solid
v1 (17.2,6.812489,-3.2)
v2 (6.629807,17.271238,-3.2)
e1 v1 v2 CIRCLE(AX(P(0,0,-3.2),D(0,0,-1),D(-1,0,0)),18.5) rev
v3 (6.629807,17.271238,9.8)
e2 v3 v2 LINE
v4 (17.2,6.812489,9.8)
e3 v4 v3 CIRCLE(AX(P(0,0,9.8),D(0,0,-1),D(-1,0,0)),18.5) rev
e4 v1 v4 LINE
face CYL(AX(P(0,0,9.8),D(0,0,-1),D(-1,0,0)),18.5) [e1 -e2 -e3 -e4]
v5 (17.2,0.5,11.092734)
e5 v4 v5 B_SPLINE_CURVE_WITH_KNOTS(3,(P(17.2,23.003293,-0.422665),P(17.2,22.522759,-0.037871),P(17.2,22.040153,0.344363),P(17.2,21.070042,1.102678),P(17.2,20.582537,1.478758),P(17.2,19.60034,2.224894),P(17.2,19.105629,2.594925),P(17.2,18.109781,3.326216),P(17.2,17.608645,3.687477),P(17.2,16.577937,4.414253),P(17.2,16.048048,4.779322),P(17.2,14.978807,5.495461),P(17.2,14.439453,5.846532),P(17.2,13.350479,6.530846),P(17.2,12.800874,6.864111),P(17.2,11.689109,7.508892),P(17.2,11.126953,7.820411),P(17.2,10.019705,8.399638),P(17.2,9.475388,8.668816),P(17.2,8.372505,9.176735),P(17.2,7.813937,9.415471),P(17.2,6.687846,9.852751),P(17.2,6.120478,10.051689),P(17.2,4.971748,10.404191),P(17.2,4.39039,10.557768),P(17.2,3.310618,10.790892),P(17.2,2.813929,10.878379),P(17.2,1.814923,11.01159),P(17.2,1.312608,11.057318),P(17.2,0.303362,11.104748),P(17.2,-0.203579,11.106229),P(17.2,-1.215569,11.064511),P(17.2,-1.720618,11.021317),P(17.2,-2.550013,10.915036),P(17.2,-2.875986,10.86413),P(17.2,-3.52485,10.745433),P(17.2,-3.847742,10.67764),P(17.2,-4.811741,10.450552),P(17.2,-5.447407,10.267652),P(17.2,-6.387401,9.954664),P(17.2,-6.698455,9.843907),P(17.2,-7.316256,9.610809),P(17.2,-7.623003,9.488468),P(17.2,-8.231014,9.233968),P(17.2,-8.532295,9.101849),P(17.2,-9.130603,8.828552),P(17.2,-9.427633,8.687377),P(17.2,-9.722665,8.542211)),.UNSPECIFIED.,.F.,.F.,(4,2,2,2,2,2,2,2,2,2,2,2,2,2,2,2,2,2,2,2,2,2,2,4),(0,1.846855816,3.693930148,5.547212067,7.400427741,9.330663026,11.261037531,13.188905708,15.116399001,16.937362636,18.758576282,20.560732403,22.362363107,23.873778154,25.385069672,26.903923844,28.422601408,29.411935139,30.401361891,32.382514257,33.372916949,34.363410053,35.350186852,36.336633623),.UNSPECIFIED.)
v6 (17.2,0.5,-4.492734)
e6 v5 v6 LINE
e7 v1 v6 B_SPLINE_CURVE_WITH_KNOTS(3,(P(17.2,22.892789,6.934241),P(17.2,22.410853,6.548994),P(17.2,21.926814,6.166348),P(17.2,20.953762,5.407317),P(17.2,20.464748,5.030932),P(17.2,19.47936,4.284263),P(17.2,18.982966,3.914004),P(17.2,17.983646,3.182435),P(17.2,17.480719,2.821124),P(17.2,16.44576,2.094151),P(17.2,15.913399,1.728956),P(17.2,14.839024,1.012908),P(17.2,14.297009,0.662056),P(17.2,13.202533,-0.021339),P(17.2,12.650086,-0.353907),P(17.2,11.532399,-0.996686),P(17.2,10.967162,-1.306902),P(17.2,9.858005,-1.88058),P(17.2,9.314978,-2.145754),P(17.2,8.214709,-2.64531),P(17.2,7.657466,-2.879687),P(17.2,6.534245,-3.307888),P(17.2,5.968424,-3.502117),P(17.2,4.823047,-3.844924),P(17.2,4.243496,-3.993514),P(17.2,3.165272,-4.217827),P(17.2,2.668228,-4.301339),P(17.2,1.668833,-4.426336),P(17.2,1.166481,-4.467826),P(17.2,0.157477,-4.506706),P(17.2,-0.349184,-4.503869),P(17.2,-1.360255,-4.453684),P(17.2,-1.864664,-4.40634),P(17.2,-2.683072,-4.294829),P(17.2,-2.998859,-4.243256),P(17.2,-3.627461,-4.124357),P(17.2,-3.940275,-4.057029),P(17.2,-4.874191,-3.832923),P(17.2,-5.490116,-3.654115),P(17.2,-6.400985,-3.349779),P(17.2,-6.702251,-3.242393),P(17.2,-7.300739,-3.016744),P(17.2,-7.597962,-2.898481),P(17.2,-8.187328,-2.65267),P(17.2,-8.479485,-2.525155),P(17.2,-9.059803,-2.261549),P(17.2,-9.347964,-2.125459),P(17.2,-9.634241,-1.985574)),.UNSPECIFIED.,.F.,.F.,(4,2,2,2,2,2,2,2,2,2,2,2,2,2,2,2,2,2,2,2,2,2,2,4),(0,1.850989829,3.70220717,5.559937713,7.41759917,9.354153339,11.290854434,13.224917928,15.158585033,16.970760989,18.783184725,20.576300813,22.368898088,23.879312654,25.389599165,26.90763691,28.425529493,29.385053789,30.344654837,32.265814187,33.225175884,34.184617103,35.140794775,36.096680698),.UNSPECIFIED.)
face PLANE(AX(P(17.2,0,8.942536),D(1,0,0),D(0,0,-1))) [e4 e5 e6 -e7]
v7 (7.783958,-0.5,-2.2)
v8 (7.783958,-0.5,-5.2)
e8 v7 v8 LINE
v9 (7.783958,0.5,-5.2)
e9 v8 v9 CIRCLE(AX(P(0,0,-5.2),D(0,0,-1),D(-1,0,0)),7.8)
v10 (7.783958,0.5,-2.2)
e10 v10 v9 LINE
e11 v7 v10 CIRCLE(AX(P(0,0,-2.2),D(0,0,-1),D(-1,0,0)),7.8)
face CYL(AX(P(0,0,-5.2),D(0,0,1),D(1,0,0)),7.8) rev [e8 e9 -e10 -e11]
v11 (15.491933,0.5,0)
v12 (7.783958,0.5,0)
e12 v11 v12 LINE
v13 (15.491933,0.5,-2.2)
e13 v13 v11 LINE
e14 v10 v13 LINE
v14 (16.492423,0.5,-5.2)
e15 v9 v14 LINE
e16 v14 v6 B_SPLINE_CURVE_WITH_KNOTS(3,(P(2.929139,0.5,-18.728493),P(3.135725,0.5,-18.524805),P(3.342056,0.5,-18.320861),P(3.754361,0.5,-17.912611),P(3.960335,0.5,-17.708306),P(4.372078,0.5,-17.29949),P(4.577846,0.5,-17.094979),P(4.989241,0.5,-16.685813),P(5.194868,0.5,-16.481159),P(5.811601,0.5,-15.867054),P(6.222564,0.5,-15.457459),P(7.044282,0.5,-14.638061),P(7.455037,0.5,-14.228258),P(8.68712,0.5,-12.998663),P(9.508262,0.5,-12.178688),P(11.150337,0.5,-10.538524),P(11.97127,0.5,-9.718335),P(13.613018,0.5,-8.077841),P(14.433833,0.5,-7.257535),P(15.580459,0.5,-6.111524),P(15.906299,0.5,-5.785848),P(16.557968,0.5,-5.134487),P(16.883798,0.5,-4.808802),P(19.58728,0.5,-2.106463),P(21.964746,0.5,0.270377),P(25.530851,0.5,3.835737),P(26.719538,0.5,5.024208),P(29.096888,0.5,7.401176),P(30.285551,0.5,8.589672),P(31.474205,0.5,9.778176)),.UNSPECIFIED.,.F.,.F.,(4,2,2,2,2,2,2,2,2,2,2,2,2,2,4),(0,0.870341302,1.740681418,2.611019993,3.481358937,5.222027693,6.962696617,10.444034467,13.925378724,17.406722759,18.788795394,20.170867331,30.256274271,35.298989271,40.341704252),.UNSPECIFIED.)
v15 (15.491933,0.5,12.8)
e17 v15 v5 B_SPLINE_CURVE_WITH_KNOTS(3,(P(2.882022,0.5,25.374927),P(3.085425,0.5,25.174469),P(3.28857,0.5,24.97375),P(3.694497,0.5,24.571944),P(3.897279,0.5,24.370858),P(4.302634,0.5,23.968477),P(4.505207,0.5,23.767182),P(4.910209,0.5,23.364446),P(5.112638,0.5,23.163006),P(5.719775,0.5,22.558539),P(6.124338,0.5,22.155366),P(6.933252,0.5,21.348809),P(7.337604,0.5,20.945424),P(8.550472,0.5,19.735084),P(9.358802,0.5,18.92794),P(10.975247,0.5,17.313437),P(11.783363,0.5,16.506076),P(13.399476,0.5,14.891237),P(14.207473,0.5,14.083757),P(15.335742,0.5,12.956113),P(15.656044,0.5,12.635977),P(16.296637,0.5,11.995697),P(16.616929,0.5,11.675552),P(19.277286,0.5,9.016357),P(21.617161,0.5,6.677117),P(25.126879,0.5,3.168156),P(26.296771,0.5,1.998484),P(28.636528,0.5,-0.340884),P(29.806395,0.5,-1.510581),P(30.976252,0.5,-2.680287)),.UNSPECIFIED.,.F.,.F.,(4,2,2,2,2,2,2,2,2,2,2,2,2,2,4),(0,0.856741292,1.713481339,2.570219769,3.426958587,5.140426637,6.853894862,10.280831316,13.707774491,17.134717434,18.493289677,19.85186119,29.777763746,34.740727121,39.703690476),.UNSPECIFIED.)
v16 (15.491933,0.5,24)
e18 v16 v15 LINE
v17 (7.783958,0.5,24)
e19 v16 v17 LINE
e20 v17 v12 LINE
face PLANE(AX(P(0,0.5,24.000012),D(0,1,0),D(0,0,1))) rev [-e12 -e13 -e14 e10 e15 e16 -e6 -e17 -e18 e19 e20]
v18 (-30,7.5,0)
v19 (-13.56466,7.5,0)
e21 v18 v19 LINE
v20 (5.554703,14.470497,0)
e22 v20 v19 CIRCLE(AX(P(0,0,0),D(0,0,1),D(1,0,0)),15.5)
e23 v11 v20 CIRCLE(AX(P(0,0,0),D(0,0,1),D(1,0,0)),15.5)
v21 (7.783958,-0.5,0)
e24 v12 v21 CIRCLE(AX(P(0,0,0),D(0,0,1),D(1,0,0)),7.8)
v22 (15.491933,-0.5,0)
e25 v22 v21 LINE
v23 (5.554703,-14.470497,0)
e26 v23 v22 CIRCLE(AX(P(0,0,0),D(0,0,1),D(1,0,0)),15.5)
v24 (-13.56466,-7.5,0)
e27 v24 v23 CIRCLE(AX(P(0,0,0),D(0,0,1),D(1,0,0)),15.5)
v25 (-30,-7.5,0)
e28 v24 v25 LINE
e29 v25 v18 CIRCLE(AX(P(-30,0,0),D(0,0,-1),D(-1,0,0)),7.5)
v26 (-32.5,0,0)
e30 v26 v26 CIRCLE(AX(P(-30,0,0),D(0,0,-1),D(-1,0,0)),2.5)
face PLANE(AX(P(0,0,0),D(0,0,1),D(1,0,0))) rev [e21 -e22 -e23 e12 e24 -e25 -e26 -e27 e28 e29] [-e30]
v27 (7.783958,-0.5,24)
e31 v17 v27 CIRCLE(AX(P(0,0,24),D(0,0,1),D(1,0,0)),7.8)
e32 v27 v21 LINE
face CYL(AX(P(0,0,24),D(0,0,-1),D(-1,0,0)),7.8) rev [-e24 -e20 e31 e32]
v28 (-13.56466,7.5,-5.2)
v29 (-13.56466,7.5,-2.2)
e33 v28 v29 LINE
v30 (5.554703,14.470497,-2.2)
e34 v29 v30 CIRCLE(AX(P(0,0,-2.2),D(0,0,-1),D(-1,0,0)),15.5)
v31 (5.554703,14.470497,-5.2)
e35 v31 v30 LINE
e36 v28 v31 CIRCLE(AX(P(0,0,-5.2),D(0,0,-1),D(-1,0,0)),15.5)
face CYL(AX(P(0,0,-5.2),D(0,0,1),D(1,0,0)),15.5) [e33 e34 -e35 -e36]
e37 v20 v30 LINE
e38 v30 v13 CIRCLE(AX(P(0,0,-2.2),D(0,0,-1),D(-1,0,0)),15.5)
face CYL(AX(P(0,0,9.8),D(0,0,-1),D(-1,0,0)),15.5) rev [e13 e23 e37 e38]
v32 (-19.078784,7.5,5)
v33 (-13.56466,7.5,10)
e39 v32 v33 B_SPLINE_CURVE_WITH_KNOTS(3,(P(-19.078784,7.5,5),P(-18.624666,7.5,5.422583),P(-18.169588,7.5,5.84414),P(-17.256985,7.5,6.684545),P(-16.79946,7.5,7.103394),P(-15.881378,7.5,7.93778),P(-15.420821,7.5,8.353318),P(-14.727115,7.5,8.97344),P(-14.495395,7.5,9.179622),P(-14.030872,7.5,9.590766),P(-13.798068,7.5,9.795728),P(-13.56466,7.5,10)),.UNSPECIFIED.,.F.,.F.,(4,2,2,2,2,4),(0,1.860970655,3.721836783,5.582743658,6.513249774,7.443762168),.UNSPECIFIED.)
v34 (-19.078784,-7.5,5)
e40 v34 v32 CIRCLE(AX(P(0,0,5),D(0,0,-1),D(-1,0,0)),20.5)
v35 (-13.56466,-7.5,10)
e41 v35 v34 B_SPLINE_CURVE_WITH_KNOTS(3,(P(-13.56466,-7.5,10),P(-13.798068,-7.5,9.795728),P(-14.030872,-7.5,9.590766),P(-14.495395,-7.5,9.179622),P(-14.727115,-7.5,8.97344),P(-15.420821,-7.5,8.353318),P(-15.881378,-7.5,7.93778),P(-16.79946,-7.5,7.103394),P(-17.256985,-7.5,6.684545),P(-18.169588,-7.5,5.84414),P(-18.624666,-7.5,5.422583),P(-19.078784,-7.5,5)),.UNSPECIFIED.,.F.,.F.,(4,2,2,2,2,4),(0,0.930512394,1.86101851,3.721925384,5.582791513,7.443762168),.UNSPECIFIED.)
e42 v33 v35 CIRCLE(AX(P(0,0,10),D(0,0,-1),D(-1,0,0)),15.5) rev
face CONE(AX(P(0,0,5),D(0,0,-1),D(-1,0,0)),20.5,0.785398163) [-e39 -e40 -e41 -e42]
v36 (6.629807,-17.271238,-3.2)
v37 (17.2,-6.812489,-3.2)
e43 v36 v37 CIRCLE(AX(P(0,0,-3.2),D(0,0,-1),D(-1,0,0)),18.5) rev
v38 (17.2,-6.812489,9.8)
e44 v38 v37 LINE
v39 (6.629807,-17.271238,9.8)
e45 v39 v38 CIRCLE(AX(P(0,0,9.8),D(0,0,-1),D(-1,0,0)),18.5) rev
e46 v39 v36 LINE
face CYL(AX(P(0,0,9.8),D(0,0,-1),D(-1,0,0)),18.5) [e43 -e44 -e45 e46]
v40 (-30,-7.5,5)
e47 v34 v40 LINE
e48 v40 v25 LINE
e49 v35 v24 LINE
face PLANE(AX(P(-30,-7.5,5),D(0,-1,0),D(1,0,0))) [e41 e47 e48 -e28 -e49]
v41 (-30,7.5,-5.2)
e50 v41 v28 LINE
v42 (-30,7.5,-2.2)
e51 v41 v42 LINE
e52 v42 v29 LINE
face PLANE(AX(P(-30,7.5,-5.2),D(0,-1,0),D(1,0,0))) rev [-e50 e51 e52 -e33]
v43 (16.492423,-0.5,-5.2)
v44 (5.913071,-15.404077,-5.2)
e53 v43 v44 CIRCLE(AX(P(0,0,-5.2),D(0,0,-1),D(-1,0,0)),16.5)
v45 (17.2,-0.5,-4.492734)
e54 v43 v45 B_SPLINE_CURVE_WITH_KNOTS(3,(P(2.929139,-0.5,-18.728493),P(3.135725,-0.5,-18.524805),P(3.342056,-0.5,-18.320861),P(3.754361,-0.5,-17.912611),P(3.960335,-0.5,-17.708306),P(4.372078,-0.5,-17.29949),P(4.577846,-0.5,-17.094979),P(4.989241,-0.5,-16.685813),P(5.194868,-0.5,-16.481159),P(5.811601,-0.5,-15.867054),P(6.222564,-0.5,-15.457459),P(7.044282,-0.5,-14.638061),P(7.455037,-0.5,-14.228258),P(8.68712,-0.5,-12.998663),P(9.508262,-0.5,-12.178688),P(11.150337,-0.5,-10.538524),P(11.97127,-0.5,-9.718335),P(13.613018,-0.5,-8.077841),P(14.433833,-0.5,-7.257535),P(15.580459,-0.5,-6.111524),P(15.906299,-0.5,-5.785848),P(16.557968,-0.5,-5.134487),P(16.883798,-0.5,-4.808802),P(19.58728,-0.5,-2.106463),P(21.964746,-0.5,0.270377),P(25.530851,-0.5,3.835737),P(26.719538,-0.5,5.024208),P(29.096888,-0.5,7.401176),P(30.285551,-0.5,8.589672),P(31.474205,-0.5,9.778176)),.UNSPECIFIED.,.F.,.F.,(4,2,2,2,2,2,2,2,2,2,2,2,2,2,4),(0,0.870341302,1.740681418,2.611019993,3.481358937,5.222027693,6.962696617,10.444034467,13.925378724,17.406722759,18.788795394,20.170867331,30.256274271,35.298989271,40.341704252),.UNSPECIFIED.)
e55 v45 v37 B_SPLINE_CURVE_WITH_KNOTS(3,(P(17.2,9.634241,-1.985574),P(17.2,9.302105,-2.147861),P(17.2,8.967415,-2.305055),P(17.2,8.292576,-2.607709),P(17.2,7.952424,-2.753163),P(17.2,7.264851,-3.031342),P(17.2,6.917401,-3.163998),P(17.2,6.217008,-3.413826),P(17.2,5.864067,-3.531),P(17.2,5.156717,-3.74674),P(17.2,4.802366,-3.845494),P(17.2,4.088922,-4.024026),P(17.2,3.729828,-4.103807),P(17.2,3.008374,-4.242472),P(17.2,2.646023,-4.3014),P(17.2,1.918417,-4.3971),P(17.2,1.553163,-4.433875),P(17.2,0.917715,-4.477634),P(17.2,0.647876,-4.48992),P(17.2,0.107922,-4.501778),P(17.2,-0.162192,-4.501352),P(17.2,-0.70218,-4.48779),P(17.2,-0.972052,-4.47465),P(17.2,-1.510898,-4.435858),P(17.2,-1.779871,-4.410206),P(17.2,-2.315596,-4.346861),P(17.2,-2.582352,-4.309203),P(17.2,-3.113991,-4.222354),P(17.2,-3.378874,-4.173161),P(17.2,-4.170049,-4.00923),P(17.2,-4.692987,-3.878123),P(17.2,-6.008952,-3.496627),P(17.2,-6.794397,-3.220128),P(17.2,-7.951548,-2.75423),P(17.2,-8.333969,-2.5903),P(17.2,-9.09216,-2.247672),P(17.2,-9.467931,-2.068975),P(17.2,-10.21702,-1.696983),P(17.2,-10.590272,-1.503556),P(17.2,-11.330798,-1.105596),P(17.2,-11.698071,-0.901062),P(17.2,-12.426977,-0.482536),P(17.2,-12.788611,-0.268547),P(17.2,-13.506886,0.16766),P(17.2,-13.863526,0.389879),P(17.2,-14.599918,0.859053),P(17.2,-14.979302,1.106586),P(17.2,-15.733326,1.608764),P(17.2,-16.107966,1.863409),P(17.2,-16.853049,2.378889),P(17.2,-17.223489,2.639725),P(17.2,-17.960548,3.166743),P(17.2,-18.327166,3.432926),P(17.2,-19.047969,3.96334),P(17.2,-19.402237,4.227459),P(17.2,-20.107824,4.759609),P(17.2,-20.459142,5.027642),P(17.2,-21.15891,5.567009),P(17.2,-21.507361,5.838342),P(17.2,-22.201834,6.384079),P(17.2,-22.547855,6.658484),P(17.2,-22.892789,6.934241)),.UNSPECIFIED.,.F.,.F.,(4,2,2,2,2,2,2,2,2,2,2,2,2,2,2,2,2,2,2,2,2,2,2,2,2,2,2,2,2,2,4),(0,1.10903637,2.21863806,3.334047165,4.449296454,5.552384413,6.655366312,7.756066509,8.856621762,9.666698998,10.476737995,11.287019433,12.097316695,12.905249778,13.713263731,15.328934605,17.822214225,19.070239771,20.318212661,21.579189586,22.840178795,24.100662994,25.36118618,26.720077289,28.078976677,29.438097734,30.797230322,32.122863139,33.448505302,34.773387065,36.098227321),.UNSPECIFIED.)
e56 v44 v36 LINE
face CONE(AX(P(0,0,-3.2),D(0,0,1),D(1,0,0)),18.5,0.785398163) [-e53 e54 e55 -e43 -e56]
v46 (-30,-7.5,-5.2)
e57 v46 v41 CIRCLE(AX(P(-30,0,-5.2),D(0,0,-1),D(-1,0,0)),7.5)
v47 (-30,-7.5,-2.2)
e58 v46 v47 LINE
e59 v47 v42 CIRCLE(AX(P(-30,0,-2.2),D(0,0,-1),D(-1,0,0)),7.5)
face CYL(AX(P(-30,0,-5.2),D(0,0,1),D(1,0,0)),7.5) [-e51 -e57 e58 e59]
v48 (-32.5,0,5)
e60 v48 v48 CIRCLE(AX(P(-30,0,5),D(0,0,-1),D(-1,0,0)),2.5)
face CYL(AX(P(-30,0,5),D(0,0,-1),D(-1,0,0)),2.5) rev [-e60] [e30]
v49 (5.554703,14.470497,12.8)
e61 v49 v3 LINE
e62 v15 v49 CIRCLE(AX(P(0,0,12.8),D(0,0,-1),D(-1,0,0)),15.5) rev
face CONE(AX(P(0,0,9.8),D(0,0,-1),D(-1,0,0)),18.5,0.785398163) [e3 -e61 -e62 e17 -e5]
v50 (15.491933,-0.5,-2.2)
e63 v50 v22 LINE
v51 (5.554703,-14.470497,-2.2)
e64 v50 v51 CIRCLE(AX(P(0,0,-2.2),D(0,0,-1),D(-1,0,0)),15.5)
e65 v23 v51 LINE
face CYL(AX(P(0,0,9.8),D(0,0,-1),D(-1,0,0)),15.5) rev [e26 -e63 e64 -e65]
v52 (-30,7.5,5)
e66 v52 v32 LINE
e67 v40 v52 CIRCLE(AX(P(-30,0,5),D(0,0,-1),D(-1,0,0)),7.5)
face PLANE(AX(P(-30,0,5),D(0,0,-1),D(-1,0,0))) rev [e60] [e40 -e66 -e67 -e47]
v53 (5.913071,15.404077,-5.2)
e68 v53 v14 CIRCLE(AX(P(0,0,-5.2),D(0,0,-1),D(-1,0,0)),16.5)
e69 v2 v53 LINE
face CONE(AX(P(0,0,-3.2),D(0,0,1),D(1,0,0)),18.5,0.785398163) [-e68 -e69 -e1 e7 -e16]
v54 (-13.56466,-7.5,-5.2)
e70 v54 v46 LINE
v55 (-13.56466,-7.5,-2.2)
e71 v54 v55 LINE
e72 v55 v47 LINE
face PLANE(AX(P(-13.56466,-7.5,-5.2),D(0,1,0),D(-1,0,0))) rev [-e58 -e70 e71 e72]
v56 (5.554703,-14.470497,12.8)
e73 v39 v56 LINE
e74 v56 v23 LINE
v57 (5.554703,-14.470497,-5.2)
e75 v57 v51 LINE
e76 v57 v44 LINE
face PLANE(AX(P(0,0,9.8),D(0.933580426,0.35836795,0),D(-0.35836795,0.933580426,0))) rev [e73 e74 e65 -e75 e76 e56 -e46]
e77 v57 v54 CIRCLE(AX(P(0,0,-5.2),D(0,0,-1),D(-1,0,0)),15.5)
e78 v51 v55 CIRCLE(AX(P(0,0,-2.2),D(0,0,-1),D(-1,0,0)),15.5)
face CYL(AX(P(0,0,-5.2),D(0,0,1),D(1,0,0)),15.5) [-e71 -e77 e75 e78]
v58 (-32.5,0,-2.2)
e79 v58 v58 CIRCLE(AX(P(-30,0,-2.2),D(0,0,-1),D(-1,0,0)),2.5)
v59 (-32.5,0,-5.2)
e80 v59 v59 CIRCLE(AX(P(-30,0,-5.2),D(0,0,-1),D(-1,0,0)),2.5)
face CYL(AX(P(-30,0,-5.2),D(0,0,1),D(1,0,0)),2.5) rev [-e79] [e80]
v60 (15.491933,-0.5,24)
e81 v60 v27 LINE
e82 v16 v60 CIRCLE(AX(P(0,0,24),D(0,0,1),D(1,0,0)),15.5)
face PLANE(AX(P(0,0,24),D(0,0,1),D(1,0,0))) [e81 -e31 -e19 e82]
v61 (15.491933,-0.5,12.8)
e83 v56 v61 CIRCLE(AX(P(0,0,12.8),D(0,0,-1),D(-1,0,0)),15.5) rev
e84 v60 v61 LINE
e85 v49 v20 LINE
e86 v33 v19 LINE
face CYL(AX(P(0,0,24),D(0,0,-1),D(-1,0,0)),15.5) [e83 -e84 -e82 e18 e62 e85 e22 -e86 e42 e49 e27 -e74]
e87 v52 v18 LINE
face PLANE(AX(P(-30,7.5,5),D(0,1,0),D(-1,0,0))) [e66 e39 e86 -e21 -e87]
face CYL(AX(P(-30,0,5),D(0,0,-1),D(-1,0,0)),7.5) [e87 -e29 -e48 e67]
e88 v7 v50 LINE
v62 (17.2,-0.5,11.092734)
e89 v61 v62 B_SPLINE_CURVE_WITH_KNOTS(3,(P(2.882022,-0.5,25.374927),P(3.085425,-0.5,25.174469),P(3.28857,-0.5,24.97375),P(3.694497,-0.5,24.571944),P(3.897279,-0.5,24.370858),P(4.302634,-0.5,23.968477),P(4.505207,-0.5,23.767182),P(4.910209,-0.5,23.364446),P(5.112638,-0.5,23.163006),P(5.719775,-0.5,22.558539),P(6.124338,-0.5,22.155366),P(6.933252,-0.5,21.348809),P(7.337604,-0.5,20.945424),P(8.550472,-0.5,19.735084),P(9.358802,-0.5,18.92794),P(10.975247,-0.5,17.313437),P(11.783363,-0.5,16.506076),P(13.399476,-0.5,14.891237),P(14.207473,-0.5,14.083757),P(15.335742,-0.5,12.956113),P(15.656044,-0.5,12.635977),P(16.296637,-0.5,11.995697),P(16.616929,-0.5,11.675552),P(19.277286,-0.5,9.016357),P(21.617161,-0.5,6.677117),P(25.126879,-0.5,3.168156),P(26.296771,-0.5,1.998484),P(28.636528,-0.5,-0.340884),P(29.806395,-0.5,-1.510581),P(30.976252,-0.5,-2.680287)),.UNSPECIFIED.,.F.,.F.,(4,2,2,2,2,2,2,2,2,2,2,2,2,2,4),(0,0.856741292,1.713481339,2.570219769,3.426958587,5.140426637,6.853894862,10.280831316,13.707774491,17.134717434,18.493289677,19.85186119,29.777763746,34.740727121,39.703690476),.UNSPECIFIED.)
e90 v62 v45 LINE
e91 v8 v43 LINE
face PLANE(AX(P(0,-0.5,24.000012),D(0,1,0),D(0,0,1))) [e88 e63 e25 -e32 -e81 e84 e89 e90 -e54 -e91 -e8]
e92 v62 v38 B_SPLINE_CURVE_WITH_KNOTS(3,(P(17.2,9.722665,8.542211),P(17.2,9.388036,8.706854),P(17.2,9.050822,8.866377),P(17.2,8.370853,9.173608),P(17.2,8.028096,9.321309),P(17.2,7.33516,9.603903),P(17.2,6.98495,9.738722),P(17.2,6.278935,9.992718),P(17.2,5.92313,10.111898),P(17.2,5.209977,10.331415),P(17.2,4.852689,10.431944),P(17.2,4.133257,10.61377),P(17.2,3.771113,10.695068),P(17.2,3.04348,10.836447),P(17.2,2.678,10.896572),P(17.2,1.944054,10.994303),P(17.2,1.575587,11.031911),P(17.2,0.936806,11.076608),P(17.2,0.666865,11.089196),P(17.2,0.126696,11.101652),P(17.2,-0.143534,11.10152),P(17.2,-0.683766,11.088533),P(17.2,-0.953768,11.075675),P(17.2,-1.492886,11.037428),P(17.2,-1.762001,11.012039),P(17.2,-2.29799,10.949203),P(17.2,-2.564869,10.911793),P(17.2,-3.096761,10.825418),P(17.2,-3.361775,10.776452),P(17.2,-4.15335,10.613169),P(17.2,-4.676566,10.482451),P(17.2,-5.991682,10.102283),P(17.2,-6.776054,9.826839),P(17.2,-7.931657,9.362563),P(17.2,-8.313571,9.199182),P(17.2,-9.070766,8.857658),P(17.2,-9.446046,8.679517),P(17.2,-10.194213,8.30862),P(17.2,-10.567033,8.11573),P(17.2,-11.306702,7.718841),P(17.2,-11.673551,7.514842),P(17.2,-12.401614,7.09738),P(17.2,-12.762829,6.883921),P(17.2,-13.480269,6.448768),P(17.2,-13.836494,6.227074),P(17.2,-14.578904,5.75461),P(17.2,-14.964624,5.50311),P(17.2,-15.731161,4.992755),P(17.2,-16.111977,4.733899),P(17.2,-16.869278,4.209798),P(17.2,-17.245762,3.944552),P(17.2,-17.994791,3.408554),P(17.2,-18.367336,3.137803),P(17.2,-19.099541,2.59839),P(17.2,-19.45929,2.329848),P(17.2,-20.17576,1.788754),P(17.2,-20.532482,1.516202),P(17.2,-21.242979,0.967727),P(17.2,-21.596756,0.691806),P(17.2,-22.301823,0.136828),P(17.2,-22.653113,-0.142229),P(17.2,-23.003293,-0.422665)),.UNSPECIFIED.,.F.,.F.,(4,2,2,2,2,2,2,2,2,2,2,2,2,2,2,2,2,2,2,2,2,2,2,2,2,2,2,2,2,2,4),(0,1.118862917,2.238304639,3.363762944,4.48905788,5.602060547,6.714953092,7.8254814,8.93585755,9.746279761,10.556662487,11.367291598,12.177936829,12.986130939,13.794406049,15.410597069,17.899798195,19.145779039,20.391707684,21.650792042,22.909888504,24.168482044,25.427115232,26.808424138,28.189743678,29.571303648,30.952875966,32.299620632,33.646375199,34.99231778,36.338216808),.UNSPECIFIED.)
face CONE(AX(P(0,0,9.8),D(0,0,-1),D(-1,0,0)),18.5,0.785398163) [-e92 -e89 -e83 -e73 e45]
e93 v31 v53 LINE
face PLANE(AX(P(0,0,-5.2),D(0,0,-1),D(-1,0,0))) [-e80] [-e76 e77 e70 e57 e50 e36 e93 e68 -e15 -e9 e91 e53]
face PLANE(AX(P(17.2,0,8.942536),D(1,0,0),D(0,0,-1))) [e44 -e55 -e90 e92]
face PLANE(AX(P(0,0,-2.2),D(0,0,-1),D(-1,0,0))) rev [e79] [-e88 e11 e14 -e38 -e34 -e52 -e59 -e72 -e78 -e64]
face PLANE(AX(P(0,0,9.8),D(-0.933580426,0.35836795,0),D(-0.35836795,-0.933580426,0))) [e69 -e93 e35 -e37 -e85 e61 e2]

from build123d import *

# Parameters (mm, degrees)
SKETCH1_R                    = 15.5
SKETCH1_R_2                  = 7.8
BOSS_EXTRUDE1_DEPTH          = 24
SKETCH2_R                    = 2.5
SKETCH2_R_2                  = 7.8
BOSS_EXTRUDE2_DEPTH          = 5
SKETCH4_R                    = 2.5
SKETCH4_R_2                  = 7.8
BOSS_EXTRUDE3_DEPTH          = 3
BOSS_EXTRUDE4_DEPTH          = 15
CHAMFER1_SIZE                = 3
CHAMFER2_SIZE                = 2
CHAMFER3_SIZE                = 5
CUT_EXTRUDE_THIN1_DEPTH      = 51.568623258
CUT_EXTRUDE_THIN1_DEPTH_BACK = 50
SKETCH6_W                    = 28.833380518
SKETCH6_H                    = 1
SKETCH7_R                    = 32.954924651
CUT_EXTRUDE1_DEPTH           = 5


with BuildPart() as part:
    # Sketch1 → Boss-Extrude1 (new body)
    with BuildSketch(Plane.XY):
        Circle(SKETCH1_R)
        Circle(SKETCH1_R_2, mode=Mode.SUBTRACT)
    extrude(amount=BOSS_EXTRUDE1_DEPTH)

    # Sketch2 → Boss-Extrude2 (add)
    with BuildSketch(Plane(origin=(0, 0, 0), x_dir=(-1, 0, 0), z_dir=(0, 0, -1))):
        with BuildLine():
            Line((30, -7.5), (13.564659966, -7.5))
            ThreePointArc((13.564659966, -7.5), (-15.5, 0), (13.564659966, 7.5))
            Line((13.564659966, 7.5), (30, 7.5))
            ThreePointArc((30, 7.5), (37.5, 0), (30, -7.5))
        make_face()
        with Locations((30, 0)):
            Circle(SKETCH2_R, mode=Mode.SUBTRACT)
        with Locations(Location((0, 0, 0), (0, 0, 180))):
            Circle(SKETCH2_R_2, mode=Mode.SUBTRACT)
    extrude(amount=-BOSS_EXTRUDE2_DEPTH)



with BuildPart() as body_2:
    # Sketch4 → Boss-Extrude3 (new body)
    with BuildSketch(Plane(origin=(0, 0, -2.2), x_dir=(-1, 0, 0), z_dir=(0, 0, -1))):
        with BuildLine():
            Line((13.564659966, -7.5), (30, -7.5))
            ThreePointArc((30, -7.5), (37.5, 0), (30, 7.5))
            Line((30, 7.5), (13.564659966, 7.5))
            ThreePointArc((13.564659966, 7.5), (-15.5, 0), (13.564659966, -7.5))
        make_face()
        with Locations((30, 0)):
            Circle(SKETCH4_R, mode=Mode.SUBTRACT)
        with Locations(Location((0, 0, 0), (0, 0, 180))):
            Circle(SKETCH4_R_2, mode=Mode.SUBTRACT)
    extrude(amount=BOSS_EXTRUDE3_DEPTH)


with BuildPart() as part_1:
    add(part.part)

    add(body_2.part)  # Boss-Extrude4 merges body 2
    # Sketch5 → Boss-Extrude4 (add)
    with BuildSketch(Plane(origin=(0, 0, -5.2), x_dir=(-1, 0, 0), z_dir=(0, 0, -1))):
        with BuildLine():
            Line((-6.629807067, -17.27123789), (-5.554703218, -14.470496611))
            ThreePointArc((-5.554703218, -14.470496611), (-15.5, 0), (-5.554703218, 14.470496611))
            Line((-5.554703218, 14.470496611), (-6.629807067, 17.27123789))
            ThreePointArc((-6.629807067, 17.27123789), (-18.5, 0), (-6.629807067, -17.27123789))
        make_face()
    extrude(amount=-BOSS_EXTRUDE4_DEPTH)

    # Chamfer1
    chamfer1_edges = [part_1.edges().sort_by_distance(p)[0] for p in [
        (12.773955924, -8.779296672, 9.8),
    ]]
    chamfer(chamfer1_edges, length=CHAMFER1_SIZE - 0.0001)  # a hair under: the kernel refuses the full size

    # Chamfer2
    chamfer2_edges = [part_1.edges().sort_by_distance(p)[0] for p in [
        (18.5, 0, -5.2),
    ]]
    chamfer(chamfer2_edges, length=CHAMFER2_SIZE)

    # Chamfer3
    chamfer3_edges = [part_1.edges().sort_by_distance(p)[0] for p in [
        (-15.5, 0, 5),
    ]]
    chamfer(chamfer3_edges, length=CHAMFER3_SIZE)

    # Sketch6 → Cut-Extrude-Thin1 (cut, two sides: drawn at the far end of the back side and taken through both)
    with BuildSketch(Plane.XY.offset(24).offset(-CUT_EXTRUDE_THIN1_DEPTH_BACK)):
        with Locations((14.416690259, 0)):
            Rectangle(SKETCH6_W, SKETCH6_H)
    extrude(amount=CUT_EXTRUDE_THIN1_DEPTH + CUT_EXTRUDE_THIN1_DEPTH_BACK, mode=Mode.SUBTRACT)

    # Sketch7 → Cut-Extrude1 (cut)
    with BuildSketch(Plane(origin=(22.2, 0, 0), x_dir=(0, 0, -1), z_dir=(1, 0, 0))):
        with Locations((-8.942536343, 0)):
            Circle(SKETCH7_R)
    extrude(amount=-CUT_EXTRUDE1_DEPTH, mode=Mode.SUBTRACT)


solid = part_1.part
